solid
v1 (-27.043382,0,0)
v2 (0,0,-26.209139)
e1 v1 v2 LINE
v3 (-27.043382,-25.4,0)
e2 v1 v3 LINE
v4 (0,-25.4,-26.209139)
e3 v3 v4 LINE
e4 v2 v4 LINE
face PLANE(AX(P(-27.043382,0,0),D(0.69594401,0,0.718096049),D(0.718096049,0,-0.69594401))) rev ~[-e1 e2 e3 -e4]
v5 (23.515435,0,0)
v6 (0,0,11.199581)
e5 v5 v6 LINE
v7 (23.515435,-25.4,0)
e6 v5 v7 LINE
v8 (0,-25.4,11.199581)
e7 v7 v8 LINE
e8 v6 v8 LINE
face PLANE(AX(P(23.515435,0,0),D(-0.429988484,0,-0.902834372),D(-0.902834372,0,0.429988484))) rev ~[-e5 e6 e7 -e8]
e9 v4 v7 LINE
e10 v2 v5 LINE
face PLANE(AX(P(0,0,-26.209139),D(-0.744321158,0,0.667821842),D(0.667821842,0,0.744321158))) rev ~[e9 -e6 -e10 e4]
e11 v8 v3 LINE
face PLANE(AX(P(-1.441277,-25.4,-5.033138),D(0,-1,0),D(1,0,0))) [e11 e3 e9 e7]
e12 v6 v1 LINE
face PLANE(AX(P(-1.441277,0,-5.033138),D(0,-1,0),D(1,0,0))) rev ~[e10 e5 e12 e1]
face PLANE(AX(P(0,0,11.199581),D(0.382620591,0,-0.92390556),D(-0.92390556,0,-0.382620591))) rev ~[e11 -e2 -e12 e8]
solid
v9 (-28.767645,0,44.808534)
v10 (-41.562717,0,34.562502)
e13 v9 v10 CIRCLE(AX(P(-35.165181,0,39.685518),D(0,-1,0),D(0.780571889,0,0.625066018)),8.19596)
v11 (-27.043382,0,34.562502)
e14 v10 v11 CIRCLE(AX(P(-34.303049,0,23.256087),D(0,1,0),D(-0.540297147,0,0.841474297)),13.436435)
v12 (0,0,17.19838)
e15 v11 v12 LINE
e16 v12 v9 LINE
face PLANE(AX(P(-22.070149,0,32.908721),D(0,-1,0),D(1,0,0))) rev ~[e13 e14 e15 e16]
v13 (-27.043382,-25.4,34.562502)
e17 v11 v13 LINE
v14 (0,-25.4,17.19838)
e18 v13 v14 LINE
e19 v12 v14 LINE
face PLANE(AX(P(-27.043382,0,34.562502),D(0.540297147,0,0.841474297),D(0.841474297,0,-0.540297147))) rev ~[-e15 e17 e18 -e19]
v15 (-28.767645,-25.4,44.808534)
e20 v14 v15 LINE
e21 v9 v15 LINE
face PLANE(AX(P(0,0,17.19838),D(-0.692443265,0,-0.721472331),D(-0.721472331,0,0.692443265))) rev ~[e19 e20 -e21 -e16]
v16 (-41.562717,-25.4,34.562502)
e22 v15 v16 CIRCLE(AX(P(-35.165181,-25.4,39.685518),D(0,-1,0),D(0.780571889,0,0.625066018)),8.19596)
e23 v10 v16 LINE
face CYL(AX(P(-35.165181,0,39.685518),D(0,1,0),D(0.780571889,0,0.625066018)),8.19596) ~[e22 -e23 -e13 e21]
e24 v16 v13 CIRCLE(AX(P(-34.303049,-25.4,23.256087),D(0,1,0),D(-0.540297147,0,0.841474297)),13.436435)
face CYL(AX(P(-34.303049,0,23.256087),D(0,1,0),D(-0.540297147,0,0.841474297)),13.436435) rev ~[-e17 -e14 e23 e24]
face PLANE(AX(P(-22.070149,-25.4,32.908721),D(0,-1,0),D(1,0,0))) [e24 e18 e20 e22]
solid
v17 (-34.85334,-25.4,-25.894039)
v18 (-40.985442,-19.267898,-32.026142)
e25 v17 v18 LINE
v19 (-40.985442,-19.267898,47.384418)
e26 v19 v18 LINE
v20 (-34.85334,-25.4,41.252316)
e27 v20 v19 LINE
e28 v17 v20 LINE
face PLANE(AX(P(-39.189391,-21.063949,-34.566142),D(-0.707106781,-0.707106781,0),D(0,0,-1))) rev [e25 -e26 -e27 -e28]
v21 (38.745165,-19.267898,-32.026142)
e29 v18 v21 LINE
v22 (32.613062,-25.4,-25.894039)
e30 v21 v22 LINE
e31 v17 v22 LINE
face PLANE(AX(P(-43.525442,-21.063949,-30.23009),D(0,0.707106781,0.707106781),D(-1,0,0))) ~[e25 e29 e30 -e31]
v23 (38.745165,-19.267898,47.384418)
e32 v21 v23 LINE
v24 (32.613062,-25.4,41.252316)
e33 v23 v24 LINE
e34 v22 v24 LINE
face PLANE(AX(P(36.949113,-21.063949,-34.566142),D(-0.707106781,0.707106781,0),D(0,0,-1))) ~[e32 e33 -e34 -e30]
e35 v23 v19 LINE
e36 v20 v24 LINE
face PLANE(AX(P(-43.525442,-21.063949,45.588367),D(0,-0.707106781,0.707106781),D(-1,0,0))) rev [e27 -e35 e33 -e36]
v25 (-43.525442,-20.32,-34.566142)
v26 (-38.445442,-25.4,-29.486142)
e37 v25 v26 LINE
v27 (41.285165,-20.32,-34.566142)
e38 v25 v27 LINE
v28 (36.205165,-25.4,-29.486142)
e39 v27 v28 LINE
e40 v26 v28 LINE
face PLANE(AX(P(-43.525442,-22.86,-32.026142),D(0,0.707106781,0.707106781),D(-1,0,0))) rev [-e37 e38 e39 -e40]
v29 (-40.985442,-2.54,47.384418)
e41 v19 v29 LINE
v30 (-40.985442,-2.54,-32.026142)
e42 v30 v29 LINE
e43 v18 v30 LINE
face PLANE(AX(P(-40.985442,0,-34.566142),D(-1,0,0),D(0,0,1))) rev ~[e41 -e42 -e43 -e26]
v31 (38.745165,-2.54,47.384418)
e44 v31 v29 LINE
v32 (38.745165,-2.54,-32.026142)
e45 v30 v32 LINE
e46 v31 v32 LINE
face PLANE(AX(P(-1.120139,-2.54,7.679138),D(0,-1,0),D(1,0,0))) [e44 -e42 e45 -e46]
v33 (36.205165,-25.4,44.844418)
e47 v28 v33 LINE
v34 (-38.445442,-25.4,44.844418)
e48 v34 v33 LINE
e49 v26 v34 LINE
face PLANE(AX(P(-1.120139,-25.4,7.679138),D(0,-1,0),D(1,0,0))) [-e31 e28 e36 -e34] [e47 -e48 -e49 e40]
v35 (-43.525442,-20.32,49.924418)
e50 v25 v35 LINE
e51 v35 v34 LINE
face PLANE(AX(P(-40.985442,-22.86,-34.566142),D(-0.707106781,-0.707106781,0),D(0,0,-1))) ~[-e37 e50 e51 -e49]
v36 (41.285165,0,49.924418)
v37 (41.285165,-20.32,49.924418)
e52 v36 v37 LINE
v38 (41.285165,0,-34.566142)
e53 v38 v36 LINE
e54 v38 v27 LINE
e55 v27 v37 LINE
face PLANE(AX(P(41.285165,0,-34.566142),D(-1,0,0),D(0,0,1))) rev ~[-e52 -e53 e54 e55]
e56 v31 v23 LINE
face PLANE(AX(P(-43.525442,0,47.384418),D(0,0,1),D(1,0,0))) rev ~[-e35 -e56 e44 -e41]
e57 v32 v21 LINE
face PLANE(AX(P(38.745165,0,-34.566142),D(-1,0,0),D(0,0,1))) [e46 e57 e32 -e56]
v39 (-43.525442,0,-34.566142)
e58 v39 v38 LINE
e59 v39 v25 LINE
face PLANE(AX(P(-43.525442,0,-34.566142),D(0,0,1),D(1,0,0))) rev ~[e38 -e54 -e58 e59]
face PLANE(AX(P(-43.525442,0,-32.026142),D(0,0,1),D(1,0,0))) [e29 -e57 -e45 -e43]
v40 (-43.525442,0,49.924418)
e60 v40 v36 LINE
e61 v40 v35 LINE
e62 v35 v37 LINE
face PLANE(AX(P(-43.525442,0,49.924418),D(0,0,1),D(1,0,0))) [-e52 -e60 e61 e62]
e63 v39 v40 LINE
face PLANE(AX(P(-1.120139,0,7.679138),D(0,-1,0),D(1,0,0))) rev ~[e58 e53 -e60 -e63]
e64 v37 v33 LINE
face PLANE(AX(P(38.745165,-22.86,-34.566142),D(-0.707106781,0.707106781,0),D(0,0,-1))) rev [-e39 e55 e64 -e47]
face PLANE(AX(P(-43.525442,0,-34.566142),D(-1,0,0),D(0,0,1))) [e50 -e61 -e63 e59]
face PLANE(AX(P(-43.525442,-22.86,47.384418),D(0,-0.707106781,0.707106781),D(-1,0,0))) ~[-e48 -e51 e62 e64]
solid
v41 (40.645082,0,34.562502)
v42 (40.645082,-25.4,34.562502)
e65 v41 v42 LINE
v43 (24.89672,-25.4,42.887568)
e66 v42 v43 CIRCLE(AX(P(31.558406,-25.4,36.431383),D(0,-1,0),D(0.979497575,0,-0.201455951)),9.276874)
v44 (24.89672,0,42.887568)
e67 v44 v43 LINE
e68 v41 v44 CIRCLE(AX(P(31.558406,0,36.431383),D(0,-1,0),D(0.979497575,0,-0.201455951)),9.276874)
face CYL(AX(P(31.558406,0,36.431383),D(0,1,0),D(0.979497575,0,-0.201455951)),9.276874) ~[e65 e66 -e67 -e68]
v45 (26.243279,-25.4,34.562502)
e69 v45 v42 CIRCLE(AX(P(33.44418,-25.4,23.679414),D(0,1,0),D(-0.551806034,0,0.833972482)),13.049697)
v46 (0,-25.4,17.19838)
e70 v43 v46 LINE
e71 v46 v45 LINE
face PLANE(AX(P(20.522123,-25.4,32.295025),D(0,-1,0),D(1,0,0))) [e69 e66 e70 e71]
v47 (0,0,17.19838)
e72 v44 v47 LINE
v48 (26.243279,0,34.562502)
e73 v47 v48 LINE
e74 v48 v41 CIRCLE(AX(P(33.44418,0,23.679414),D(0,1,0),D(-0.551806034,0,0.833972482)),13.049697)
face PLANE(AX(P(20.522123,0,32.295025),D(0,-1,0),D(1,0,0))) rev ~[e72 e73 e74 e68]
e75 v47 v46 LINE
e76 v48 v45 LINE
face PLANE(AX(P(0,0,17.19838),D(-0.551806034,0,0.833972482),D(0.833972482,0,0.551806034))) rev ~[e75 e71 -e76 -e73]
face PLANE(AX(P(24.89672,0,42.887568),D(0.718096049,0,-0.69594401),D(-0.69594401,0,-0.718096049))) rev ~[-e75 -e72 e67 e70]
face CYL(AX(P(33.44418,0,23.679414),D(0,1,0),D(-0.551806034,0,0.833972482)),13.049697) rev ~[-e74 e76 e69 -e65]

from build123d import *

# Parameters (mm, degrees)
F2_DEPTH = 25.4
F1_W     = 84.8106071353
F1_H     = 84.4905599952
F3_SIZE  = 5.08
F4_T     = -2.54


with BuildPart() as f2:
    # F0 (on Front) → F2 (new body)
    with BuildSketch(Plane.XZ):
        Polygon((23.5154349893, 0), (0, 11.1995805055), (-27.0433817059, 0), (0, -26.2091394757), align=None)
    extrude(amount=F2_DEPTH)


with BuildPart() as f2b:
    # F0 (on Front) → F2, piece 2 (new body)
    with BuildSketch(Plane.XZ):
        with BuildLine():
            Line((0, 17.1983804844), (-28.7676450394, 44.8085343447))
            ThreePointArc((-28.7676450394, 44.8085343447), (-40.2881972418, 46.0830542588), (-41.5627171559, 34.5625020564))
            ThreePointArc((-41.5627171559, 34.5625020564), (-34.3030494309, 36.6925224262), (-27.0433817059, 34.5625020564))
            Line((-27.0433817059, 34.5625020564), (0, 17.1983804844))
        make_face()
    extrude(amount=F2_DEPTH)


with BuildPart() as f2c:
    # F0 (on Front) → F2, piece 3 (new body)
    with BuildSketch(Plane.XZ):
        with BuildLine():
            Line((24.8967199784, 42.8875681139), (0, 17.1983804844))
            Line((0, 17.1983804844), (26.2432787567, 34.5625020564))
            ThreePointArc((26.2432787567, 34.5625020564), (33.4441801533, 36.7291108135), (40.6450815499, 34.5625020564))
            ThreePointArc((40.6450815499, 34.5625020564), (35.8939367202, 44.632819972), (24.8967199784, 42.8875681139))
        make_face()
    extrude(amount=F2_DEPTH)


with BuildPart() as f2d:
    # F1 (on Front) → F2, piece 4 (new body)
    with BuildSketch(Plane.XZ):
        with Locations((-1.1201389134, 7.6791383326)):
            Rectangle(F1_W, F1_H)
    extrude(amount=F2_DEPTH)

    # F3
    f3_edges = [f2d.edges().sort_by_distance(p)[0] for p in [
        (-43.525442, -25.4, 7.679138),
        (-1.120139, -25.4, 49.924418),
        (41.285165, -25.4, 7.679138),
        (-1.120139, -25.4, -34.566142),
    ]]
    chamfer(f3_edges, length=F3_SIZE)

    # F4
    f4_openings = [f2d.faces().sort_by_distance(p)[0] for p in [
        (-1.120139, -25.4, 7.679138),
    ]]
    offset(amount=F4_T, openings=f4_openings, kind=Kind.INTERSECTION)


solid = Compound([f2.part, f2b.part, f2c.part, f2d.part])
